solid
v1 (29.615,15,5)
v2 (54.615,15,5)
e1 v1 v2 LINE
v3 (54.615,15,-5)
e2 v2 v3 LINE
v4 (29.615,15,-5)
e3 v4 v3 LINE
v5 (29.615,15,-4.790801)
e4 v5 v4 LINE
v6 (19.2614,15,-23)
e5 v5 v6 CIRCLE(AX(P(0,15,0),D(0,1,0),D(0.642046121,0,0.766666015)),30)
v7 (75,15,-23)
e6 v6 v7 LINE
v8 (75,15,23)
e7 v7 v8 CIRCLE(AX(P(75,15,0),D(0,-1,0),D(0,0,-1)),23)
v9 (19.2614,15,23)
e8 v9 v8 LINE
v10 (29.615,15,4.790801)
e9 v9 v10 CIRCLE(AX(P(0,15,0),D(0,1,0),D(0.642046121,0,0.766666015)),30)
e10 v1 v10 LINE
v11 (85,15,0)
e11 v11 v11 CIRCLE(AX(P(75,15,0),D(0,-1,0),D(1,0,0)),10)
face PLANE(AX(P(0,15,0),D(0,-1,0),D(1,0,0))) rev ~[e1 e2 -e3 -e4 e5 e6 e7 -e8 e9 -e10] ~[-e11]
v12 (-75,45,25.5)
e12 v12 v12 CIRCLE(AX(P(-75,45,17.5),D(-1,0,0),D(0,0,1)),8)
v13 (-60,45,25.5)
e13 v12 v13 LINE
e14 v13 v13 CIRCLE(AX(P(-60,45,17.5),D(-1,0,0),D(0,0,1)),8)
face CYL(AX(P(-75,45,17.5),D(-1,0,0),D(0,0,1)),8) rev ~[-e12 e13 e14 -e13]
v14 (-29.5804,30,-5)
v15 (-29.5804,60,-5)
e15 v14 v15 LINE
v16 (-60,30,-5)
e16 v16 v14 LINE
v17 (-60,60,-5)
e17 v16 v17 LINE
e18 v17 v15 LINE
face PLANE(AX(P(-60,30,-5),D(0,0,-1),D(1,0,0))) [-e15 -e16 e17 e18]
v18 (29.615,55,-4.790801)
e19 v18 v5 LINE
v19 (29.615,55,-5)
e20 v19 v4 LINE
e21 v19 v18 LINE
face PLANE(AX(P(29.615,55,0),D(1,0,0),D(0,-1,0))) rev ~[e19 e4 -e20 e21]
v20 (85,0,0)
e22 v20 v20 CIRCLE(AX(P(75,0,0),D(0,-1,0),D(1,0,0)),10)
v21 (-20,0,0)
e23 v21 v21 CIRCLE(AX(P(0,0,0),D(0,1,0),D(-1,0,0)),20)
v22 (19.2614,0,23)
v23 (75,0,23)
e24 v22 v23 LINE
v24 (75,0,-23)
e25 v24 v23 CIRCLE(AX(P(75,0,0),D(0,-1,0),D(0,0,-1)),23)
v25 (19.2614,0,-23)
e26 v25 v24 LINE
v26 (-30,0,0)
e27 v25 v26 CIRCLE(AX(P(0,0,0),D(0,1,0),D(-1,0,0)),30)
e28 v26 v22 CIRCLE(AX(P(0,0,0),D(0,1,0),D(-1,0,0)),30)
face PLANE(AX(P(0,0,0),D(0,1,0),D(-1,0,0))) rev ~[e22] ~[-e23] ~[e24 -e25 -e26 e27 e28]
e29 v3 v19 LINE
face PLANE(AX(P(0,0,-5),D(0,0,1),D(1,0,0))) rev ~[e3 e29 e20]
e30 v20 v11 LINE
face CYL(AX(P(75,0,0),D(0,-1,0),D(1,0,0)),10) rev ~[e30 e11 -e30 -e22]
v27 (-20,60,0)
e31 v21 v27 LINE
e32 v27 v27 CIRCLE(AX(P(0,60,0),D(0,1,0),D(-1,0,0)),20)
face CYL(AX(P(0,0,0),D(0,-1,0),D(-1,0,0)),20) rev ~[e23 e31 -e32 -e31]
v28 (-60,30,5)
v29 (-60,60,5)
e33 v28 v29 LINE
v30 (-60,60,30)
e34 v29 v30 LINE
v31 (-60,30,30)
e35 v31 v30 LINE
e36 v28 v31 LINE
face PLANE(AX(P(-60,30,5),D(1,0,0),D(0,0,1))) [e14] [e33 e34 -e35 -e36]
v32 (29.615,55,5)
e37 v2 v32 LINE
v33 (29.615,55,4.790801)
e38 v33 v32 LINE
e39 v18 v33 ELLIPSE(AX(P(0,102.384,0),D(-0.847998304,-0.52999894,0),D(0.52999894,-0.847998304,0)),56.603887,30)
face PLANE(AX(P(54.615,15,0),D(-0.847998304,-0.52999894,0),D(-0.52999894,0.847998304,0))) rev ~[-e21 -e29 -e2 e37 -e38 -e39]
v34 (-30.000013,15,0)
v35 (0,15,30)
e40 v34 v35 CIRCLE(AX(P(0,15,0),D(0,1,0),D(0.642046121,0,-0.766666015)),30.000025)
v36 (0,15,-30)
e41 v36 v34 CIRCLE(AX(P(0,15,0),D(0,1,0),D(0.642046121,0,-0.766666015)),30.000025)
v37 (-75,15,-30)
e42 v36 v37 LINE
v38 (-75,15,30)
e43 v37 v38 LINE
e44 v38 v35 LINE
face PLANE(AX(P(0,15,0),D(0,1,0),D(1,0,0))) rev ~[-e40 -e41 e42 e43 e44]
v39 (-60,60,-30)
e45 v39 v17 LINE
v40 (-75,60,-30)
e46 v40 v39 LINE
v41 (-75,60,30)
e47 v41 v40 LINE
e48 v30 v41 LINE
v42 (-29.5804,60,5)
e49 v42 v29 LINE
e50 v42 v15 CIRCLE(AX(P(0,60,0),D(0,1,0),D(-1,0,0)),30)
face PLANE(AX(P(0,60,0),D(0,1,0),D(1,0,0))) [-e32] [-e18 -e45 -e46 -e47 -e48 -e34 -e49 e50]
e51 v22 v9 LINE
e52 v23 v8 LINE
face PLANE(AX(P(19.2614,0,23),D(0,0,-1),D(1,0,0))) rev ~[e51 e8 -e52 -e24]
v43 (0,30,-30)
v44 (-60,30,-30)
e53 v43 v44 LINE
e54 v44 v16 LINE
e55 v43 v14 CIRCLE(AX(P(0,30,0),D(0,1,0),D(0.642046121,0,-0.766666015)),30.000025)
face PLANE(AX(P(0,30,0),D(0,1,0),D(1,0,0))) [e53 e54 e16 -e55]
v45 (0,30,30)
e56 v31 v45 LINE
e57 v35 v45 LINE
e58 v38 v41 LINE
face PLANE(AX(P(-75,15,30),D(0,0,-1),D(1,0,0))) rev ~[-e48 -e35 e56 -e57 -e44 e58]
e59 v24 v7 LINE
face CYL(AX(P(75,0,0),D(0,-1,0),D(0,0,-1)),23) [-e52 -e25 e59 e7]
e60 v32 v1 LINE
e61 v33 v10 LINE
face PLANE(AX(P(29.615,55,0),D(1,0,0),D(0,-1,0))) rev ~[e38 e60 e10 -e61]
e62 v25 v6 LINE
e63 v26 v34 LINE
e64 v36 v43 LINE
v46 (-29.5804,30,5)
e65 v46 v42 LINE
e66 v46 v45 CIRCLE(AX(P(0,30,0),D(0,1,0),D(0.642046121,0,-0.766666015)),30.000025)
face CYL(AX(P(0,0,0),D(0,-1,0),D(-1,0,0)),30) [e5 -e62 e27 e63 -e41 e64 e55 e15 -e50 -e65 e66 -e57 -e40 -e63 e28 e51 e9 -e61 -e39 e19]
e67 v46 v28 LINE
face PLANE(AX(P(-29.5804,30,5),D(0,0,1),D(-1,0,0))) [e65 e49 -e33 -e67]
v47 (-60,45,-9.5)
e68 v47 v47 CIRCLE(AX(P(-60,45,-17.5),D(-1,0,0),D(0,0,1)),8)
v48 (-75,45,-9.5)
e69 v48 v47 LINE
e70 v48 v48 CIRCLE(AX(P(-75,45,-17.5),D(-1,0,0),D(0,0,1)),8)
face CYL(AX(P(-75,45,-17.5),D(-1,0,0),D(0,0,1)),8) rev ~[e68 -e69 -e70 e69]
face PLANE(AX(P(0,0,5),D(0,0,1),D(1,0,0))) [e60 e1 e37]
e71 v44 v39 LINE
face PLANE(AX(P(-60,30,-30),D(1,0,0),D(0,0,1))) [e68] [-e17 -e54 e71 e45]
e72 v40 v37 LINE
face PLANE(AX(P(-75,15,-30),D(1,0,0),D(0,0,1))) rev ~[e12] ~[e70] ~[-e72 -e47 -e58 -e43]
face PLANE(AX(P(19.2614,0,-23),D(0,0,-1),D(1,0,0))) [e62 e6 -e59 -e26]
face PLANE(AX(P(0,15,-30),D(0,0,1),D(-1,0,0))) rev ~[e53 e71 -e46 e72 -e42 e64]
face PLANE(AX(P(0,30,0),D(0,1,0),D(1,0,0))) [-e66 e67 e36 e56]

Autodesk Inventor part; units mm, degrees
ref_plane "YZ Plane" through (0, 0, 0) normal (1, 0, 0) x (0, 1, 0)
ref_plane "XZ Plane" through (0, 0, 0) normal (0, 1, 0) x (-1, 0, 0)
ref_plane "XY Plane" through (0, 0, 0) normal (0, 0, 1) x (1, 0, 0)
sketch "Sketch1" plane through (0, 0, 0) normal (0, 1, 0) x (-1, 0, 0)
  circle A0 centre (0, 0) radius 30
  circle A1 centre (0, 0) radius 20
  dimension "d0" = 60
  dimension "d1" = 40
extrude "Extrusion1" add sketch "Sketch1" along normal blind 60
sketch "Sketch2" plane through (0, 0, 0) normal (0, -1, 0) x (1, 0, 0)
  circle A0 centre (75, 0) radius 10
  arc A1 (75, -23) -> (75, 23) centre (75, 0) ccw
  circle A2 centre (0, 0) radius 30 projected
  line L0 (19.2614, 23) -> (75, 23)
  line L1 (19.2614, -23) -> (75, -23)
  dimension "d4" = 20
  dimension "d5" = 46
  dimension "d8" = 75
extrude "Extrusion2" add sketch "Sketch2" against normal blind 15 contours L1 A2 L0 A1
sketch "Sketch3" plane through (0, 15, 0) normal (0, 1, 0) x (1, 0, 0)
  line L0 (-75, -30) -> (0, -30)
  line L1 (0, -30) -> (0, 30)
  line L2 (0, 30) -> (-75, 30)
  line L3 (-75, 30) -> (-75, -30)
  arc A0 (19.2614, 23) -> (19.2614, -23) centre (0, 0) ccw projected
  dimension "d11" = 60
  dimension "d12" = 75
extrude "Extrusion3" add sketch "Sketch3" along normal blind 15 contours L3 L2 A0 L0
sketch "Sketch4" plane through (0, 30, 0) normal (0, 1, 0) x (1, 0, 0)
  line L0 (-75, 30) -> (-60, 30)
  line L1 (-60, 30) -> (-60, -30)
  line L2 (-60, -30) -> (-75, -30)
  line L3 (-75, -30) -> (-75, 30)
  line L4 (0, 30) -> (-75, 30) projected
  line L5 (-75, 30) -> (-75, -30) projected
  line L6 (-75, -30) -> (0, -30) projected
  line L7 (-60, 5) -> (-29.5804, 5)
  line L8 (-29.5804, 5) -> (-29.5804, -5)
  line L9 (-29.5804, -5) -> (-60, -5)
  line L10 (-60, -5) -> (-60, 5)
  circle A0 centre (0, 0) radius 30 projected
  dimension "d15" = 15
  dimension "d16" = 10
extrude "Extrusion4" add sketch "Sketch4" along normal blind 30 contours L0 L1 L2 L3 | L7 A0 L9 L1 | L8 A0 picked at (-29.7047, 0.5579)
sketch "Sketch5" plane through (-75, 15, -30) normal (-1, 0, 0) x (0, 0, 1)
  circle A0 centre (12.5, 30) radius 8
  circle A1 centre (47.5, 30) radius 8
  line L0 (60, 0) -> (60, 45) projected
  line L1 (0, 45) -> (60, 45) projected
  point P0 (30, -15)
  dimension "d19" = 16
  dimension "d20" = 35
  dimension "d21" = 12.5
  dimension "d22" = 15
extrude "Extrusion5" cut sketch "Sketch5" against normal up to surface (15 mm away)
sketch "Sketch6" plane through (0, 0, 0) normal (0, 0, 1) x (1, 0, 0)
  line L0 (29.615, 55) -> (29.615, 15)
  line L1 (29.615, 15) -> (54.615, 15)
  line L2 (54.615, 15) -> (29.615, 55)
  line L3 (19.2614, 15) -> (75, 15) projected
  line L4 (29.998, 59.9996) -> (29.998, 15) construction
  point P0 (0, 0)
  dimension "d25" = 25
  dimension "d26" = 40
  dimension "d27" = 0.383
extrude "Extrusion6" add sketch "Sketch6" along normal mid plane 10
properties part number "Exercise03"
